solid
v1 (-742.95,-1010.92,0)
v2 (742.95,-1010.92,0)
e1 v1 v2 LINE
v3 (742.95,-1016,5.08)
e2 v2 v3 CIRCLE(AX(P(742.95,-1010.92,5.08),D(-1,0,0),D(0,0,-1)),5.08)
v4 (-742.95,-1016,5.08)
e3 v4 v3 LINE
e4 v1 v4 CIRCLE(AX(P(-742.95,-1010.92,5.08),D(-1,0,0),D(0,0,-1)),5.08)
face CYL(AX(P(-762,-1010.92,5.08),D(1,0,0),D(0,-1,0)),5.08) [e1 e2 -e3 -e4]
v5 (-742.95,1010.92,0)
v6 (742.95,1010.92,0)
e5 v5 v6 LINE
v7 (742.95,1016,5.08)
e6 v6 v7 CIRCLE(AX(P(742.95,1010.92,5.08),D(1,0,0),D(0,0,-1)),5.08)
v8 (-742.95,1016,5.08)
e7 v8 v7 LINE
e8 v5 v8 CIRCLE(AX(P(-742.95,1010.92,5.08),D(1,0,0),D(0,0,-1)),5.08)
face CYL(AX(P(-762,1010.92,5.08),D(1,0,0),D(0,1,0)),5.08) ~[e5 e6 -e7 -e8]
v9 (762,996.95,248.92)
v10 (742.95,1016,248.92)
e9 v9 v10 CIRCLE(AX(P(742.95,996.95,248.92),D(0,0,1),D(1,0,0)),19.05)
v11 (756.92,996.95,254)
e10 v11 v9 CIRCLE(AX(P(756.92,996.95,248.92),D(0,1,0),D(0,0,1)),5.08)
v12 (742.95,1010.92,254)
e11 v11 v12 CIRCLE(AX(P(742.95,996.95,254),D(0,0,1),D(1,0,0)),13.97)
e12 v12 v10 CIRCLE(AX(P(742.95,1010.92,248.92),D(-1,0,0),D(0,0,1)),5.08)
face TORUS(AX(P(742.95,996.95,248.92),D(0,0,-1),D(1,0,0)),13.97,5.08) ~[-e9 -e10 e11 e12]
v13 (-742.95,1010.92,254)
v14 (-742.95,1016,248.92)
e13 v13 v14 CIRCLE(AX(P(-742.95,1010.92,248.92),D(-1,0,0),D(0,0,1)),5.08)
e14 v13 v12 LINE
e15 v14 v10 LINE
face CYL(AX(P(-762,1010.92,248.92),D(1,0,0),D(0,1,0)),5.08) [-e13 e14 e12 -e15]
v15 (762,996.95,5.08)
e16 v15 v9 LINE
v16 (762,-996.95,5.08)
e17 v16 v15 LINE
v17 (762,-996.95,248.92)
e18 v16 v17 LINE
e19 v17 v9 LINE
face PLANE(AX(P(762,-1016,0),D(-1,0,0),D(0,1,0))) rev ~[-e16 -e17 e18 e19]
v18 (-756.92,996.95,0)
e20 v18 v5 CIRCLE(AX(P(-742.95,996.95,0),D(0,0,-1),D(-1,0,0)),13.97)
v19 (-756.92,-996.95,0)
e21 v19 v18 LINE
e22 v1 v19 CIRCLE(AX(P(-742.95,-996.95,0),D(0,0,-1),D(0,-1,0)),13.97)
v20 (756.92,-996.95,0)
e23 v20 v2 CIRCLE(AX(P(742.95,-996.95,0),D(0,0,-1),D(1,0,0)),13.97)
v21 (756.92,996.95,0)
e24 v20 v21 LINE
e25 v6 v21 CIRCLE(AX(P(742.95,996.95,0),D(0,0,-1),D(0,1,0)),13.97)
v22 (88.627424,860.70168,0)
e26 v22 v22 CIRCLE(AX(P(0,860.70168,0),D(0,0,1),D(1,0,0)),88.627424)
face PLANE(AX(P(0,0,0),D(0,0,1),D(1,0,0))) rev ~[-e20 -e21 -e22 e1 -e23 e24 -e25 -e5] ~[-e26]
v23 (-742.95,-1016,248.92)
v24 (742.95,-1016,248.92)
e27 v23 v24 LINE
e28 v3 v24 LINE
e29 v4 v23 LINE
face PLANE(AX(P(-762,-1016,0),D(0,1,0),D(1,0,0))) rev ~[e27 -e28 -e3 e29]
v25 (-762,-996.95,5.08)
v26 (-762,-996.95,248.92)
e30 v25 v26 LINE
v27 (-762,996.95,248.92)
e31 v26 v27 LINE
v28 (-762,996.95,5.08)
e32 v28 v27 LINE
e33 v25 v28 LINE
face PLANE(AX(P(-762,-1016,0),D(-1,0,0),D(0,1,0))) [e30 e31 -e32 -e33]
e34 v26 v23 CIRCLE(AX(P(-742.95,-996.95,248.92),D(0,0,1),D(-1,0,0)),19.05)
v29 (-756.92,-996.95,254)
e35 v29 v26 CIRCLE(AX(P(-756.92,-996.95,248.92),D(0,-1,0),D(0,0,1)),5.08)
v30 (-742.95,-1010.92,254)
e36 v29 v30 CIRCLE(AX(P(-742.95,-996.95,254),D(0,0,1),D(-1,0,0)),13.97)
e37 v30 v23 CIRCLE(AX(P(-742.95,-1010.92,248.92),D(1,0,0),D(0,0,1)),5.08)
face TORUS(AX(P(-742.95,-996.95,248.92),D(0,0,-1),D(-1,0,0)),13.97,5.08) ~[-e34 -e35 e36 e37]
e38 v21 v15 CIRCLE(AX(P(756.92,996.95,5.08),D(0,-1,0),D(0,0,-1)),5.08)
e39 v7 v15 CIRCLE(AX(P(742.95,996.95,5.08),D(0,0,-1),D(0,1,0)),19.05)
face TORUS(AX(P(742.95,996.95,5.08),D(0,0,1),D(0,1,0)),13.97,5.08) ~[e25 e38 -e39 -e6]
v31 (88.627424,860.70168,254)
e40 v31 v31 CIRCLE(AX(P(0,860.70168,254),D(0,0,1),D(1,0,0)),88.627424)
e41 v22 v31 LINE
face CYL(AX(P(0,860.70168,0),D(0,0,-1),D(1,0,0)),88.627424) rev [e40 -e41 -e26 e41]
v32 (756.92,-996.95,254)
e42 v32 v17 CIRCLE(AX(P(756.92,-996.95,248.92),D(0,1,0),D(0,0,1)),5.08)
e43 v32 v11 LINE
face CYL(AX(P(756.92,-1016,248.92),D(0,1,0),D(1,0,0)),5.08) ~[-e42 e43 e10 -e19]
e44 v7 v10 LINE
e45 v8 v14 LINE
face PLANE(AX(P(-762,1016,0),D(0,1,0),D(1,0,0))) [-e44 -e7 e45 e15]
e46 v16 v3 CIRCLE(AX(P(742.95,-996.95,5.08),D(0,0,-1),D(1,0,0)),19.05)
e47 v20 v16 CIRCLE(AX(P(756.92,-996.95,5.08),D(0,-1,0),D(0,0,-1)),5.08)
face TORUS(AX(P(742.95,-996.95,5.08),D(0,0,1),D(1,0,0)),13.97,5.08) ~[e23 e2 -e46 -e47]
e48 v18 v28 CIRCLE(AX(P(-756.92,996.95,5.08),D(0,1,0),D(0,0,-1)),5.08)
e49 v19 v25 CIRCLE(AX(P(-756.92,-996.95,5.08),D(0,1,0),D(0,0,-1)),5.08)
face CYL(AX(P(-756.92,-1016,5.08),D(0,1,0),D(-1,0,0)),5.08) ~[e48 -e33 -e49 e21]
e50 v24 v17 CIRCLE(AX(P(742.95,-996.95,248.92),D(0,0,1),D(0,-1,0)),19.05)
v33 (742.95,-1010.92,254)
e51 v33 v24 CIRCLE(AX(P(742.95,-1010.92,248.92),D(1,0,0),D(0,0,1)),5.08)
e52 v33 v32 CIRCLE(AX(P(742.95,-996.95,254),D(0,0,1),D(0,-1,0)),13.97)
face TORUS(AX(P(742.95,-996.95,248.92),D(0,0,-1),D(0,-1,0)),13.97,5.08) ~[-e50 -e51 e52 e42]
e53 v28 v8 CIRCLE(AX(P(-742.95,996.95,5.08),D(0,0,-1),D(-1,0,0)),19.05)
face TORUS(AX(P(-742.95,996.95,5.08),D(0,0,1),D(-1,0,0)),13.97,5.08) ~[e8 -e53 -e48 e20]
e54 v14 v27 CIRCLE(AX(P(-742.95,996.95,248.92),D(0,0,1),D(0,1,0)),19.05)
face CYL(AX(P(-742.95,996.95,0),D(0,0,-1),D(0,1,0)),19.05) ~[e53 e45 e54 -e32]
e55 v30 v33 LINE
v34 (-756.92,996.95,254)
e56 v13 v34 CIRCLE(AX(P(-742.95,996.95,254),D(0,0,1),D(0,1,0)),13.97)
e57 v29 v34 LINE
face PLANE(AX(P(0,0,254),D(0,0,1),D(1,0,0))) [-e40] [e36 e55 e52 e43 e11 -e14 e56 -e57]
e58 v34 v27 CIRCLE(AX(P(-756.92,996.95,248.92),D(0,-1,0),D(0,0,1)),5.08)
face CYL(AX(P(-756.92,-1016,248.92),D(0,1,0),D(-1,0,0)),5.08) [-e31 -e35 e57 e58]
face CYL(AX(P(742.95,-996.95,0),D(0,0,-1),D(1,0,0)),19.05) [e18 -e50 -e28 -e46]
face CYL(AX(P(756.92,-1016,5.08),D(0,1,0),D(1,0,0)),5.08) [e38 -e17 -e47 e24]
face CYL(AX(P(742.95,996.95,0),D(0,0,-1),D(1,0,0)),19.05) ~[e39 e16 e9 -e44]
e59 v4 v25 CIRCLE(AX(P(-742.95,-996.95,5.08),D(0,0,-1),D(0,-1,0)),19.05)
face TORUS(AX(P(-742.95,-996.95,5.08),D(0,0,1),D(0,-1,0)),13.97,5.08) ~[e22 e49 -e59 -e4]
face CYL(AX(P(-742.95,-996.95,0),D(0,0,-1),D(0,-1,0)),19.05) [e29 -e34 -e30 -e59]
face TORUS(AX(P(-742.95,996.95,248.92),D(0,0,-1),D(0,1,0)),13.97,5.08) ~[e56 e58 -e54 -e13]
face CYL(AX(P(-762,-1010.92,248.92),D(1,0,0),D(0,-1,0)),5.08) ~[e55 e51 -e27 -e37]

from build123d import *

# Parameters (mm, degrees)
F0_W         = 1524
F0_H         = 2032
F0_R         = 88.6274236121
F1_DEPTH     = 254
F2_R         = 5.08
F3_T1_DEPTH  = 254
F3_T4_ANGLE  = 90
F3_T6_ANGLE  = 90
F3_T8_ANGLE  = 90
F3_T10_ANGLE = 90
F3_T12_ANGLE = 90
F3_T14_ANGLE = 90
F3_T16_ANGLE = 90
F3_T18_ANGLE = 90


# Not quite as in the source:
# - a fillet or chamfer that OpenCascade refuses, or shapes differently, is made with other operations: its cross-section is extruded or revolved along the edge and cut away or added


with BuildPart() as f1:
    # F0 (on Top) → F1 (new body)
    with BuildSketch(Plane.XY):
        Rectangle(F0_W, F0_H)
        with Locations((0, 860.7016801834)):
            Circle(F0_R, mode=Mode.SUBTRACT)
    extrude(amount=F1_DEPTH)

    # F2
    f2_edges = [f1.edges().sort_by_distance(p)[0] for p in [
        (-762, 0, 254),
        (0, -1016, 254),
        (762, 0, 254),
        (0, 1016, 254),
        (0, 1016, 0),
        (762, 0, 0),
        (0, -1016, 0),
        (-762, 0, 0),
    ]]
    fillet(f2_edges, radius=F2_R)

    # F3: fillet of radius 19.05 on 4 edges, made by hand

    # F3_s2 → F3_t1 (cut)
    with BuildSketch(Plane.XY):
        with BuildLine():
            ThreePointArc((762, 996.95), (756.4203841816, 1010.4203841816), (742.95, 1016))
            Line((742.95, 1016), (762, 1016))
            Line((762, 1016), (762, 996.95))
        make_face()
        with BuildLine():
            ThreePointArc((762, -996.95), (756.4203841816, -1010.4203841816), (742.95, -1016))
            Line((742.95, -1016), (762, -1016))
            Line((762, -1016), (762, -996.95))
        make_face()
        with BuildLine():
            ThreePointArc((-742.95, -1016), (-756.4203841816, -1010.4203841816), (-762, -996.95))
            Line((-762, -996.95), (-762, -1016))
            Line((-762, -1016), (-742.95, -1016))
        make_face()
        with BuildLine():
            ThreePointArc((-742.95, 1016), (-756.4203841816, 1010.4203841816), (-762, 996.95))
            Line((-762, 996.95), (-762, 1016))
            Line((-762, 1016), (-742.95, 1016))
        make_face()
    extrude(amount=F3_T1_DEPTH, mode=Mode.SUBTRACT)

    # F3_s3 → F3_t4 (revolve, cut)
    with BuildSketch(Plane.XZ.offset(-996.95)):
        with BuildLine():
            ThreePointArc((-756.92, 0), (-760.5121024484, 1.4878975516), (-762, 5.08))
            Line((-762, 5.08), (-762, 0))
            Line((-762, 0), (-756.92, 0))
        make_face()
    revolve(axis=Axis((-742.95, 996.95, 0), (0, 0, -1)), revolution_arc=F3_T4_ANGLE, mode=Mode.SUBTRACT)

    # F3_s5 → F3_t6 (revolve, cut)
    with BuildSketch(Plane.YZ.offset(-742.95)):
        with BuildLine():
            ThreePointArc((1010.92, 254), (1014.5121024484, 252.5121024484), (1016, 248.92))
            Line((1016, 248.92), (1016, 254))
            Line((1016, 254), (1010.92, 254))
        make_face()
    revolve(axis=Axis((-742.95, 996.95, 254), (0, 0, 1)), revolution_arc=F3_T6_ANGLE, mode=Mode.SUBTRACT)

    # F3_s7 → F3_t8 (revolve, cut)
    with BuildSketch(Plane.YZ.offset(-742.95)):
        with BuildLine():
            ThreePointArc((-1010.92, 0), (-1014.5121024484, 1.4878975516), (-1016, 5.08))
            Line((-1016, 5.08), (-1016, 0))
            Line((-1016, 0), (-1010.92, 0))
        make_face()
    revolve(axis=Axis((-742.95, -996.95, 0), (0, 0, -1)), revolution_arc=F3_T8_ANGLE, mode=Mode.SUBTRACT)

    # F3_s9 → F3_t10 (revolve, cut)
    with BuildSketch(Plane.XZ.offset(996.95)):
        with BuildLine():
            ThreePointArc((-756.92, 254), (-760.5121024484, 252.5121024484), (-762, 248.92))
            Line((-762, 248.92), (-762, 254))
            Line((-762, 254), (-756.92, 254))
        make_face()
    revolve(axis=Axis((-742.95, -996.95, 254), (0, 0, 1)), revolution_arc=F3_T10_ANGLE, mode=Mode.SUBTRACT)

    # F3_s11 → F3_t12 (revolve, cut)
    with BuildSketch(Plane.XZ.offset(996.95)):
        with BuildLine():
            ThreePointArc((756.92, 0), (760.5121024484, 1.4878975516), (762, 5.08))
            Line((762, 5.08), (762, 0))
            Line((762, 0), (756.92, 0))
        make_face()
    revolve(axis=Axis((742.95, -996.95, 0), (0, 0, -1)), revolution_arc=F3_T12_ANGLE, mode=Mode.SUBTRACT)

    # F3_s13 → F3_t14 (revolve, cut)
    with BuildSketch(Plane.YZ.offset(742.95)):
        with BuildLine():
            ThreePointArc((-1010.92, 254), (-1014.5121024484, 252.5121024484), (-1016, 248.92))
            Line((-1016, 248.92), (-1016, 254))
            Line((-1016, 254), (-1010.92, 254))
        make_face()
    revolve(axis=Axis((742.95, -996.95, 254), (0, 0, 1)), revolution_arc=F3_T14_ANGLE, mode=Mode.SUBTRACT)

    # F3_s15 → F3_t16 (revolve, cut)
    with BuildSketch(Plane.YZ.offset(742.95)):
        with BuildLine():
            ThreePointArc((1010.92, 0), (1014.5121024484, 1.4878975516), (1016, 5.08))
            Line((1016, 5.08), (1016, 0))
            Line((1016, 0), (1010.92, 0))
        make_face()
    revolve(axis=Axis((742.95, 996.95, 0), (0, 0, -1)), revolution_arc=F3_T16_ANGLE, mode=Mode.SUBTRACT)

    # F3_s17 → F3_t18 (revolve, cut)
    with BuildSketch(Plane.XZ.offset(-996.95)):
        with BuildLine():
            ThreePointArc((756.92, 254), (760.5121024484, 252.5121024484), (762, 248.92))
            Line((762, 248.92), (762, 254))
            Line((762, 254), (756.92, 254))
        make_face()
    revolve(axis=Axis((742.95, 996.95, 254), (0, 0, 1)), revolution_arc=F3_T18_ANGLE, mode=Mode.SUBTRACT)


solid = f1.part
